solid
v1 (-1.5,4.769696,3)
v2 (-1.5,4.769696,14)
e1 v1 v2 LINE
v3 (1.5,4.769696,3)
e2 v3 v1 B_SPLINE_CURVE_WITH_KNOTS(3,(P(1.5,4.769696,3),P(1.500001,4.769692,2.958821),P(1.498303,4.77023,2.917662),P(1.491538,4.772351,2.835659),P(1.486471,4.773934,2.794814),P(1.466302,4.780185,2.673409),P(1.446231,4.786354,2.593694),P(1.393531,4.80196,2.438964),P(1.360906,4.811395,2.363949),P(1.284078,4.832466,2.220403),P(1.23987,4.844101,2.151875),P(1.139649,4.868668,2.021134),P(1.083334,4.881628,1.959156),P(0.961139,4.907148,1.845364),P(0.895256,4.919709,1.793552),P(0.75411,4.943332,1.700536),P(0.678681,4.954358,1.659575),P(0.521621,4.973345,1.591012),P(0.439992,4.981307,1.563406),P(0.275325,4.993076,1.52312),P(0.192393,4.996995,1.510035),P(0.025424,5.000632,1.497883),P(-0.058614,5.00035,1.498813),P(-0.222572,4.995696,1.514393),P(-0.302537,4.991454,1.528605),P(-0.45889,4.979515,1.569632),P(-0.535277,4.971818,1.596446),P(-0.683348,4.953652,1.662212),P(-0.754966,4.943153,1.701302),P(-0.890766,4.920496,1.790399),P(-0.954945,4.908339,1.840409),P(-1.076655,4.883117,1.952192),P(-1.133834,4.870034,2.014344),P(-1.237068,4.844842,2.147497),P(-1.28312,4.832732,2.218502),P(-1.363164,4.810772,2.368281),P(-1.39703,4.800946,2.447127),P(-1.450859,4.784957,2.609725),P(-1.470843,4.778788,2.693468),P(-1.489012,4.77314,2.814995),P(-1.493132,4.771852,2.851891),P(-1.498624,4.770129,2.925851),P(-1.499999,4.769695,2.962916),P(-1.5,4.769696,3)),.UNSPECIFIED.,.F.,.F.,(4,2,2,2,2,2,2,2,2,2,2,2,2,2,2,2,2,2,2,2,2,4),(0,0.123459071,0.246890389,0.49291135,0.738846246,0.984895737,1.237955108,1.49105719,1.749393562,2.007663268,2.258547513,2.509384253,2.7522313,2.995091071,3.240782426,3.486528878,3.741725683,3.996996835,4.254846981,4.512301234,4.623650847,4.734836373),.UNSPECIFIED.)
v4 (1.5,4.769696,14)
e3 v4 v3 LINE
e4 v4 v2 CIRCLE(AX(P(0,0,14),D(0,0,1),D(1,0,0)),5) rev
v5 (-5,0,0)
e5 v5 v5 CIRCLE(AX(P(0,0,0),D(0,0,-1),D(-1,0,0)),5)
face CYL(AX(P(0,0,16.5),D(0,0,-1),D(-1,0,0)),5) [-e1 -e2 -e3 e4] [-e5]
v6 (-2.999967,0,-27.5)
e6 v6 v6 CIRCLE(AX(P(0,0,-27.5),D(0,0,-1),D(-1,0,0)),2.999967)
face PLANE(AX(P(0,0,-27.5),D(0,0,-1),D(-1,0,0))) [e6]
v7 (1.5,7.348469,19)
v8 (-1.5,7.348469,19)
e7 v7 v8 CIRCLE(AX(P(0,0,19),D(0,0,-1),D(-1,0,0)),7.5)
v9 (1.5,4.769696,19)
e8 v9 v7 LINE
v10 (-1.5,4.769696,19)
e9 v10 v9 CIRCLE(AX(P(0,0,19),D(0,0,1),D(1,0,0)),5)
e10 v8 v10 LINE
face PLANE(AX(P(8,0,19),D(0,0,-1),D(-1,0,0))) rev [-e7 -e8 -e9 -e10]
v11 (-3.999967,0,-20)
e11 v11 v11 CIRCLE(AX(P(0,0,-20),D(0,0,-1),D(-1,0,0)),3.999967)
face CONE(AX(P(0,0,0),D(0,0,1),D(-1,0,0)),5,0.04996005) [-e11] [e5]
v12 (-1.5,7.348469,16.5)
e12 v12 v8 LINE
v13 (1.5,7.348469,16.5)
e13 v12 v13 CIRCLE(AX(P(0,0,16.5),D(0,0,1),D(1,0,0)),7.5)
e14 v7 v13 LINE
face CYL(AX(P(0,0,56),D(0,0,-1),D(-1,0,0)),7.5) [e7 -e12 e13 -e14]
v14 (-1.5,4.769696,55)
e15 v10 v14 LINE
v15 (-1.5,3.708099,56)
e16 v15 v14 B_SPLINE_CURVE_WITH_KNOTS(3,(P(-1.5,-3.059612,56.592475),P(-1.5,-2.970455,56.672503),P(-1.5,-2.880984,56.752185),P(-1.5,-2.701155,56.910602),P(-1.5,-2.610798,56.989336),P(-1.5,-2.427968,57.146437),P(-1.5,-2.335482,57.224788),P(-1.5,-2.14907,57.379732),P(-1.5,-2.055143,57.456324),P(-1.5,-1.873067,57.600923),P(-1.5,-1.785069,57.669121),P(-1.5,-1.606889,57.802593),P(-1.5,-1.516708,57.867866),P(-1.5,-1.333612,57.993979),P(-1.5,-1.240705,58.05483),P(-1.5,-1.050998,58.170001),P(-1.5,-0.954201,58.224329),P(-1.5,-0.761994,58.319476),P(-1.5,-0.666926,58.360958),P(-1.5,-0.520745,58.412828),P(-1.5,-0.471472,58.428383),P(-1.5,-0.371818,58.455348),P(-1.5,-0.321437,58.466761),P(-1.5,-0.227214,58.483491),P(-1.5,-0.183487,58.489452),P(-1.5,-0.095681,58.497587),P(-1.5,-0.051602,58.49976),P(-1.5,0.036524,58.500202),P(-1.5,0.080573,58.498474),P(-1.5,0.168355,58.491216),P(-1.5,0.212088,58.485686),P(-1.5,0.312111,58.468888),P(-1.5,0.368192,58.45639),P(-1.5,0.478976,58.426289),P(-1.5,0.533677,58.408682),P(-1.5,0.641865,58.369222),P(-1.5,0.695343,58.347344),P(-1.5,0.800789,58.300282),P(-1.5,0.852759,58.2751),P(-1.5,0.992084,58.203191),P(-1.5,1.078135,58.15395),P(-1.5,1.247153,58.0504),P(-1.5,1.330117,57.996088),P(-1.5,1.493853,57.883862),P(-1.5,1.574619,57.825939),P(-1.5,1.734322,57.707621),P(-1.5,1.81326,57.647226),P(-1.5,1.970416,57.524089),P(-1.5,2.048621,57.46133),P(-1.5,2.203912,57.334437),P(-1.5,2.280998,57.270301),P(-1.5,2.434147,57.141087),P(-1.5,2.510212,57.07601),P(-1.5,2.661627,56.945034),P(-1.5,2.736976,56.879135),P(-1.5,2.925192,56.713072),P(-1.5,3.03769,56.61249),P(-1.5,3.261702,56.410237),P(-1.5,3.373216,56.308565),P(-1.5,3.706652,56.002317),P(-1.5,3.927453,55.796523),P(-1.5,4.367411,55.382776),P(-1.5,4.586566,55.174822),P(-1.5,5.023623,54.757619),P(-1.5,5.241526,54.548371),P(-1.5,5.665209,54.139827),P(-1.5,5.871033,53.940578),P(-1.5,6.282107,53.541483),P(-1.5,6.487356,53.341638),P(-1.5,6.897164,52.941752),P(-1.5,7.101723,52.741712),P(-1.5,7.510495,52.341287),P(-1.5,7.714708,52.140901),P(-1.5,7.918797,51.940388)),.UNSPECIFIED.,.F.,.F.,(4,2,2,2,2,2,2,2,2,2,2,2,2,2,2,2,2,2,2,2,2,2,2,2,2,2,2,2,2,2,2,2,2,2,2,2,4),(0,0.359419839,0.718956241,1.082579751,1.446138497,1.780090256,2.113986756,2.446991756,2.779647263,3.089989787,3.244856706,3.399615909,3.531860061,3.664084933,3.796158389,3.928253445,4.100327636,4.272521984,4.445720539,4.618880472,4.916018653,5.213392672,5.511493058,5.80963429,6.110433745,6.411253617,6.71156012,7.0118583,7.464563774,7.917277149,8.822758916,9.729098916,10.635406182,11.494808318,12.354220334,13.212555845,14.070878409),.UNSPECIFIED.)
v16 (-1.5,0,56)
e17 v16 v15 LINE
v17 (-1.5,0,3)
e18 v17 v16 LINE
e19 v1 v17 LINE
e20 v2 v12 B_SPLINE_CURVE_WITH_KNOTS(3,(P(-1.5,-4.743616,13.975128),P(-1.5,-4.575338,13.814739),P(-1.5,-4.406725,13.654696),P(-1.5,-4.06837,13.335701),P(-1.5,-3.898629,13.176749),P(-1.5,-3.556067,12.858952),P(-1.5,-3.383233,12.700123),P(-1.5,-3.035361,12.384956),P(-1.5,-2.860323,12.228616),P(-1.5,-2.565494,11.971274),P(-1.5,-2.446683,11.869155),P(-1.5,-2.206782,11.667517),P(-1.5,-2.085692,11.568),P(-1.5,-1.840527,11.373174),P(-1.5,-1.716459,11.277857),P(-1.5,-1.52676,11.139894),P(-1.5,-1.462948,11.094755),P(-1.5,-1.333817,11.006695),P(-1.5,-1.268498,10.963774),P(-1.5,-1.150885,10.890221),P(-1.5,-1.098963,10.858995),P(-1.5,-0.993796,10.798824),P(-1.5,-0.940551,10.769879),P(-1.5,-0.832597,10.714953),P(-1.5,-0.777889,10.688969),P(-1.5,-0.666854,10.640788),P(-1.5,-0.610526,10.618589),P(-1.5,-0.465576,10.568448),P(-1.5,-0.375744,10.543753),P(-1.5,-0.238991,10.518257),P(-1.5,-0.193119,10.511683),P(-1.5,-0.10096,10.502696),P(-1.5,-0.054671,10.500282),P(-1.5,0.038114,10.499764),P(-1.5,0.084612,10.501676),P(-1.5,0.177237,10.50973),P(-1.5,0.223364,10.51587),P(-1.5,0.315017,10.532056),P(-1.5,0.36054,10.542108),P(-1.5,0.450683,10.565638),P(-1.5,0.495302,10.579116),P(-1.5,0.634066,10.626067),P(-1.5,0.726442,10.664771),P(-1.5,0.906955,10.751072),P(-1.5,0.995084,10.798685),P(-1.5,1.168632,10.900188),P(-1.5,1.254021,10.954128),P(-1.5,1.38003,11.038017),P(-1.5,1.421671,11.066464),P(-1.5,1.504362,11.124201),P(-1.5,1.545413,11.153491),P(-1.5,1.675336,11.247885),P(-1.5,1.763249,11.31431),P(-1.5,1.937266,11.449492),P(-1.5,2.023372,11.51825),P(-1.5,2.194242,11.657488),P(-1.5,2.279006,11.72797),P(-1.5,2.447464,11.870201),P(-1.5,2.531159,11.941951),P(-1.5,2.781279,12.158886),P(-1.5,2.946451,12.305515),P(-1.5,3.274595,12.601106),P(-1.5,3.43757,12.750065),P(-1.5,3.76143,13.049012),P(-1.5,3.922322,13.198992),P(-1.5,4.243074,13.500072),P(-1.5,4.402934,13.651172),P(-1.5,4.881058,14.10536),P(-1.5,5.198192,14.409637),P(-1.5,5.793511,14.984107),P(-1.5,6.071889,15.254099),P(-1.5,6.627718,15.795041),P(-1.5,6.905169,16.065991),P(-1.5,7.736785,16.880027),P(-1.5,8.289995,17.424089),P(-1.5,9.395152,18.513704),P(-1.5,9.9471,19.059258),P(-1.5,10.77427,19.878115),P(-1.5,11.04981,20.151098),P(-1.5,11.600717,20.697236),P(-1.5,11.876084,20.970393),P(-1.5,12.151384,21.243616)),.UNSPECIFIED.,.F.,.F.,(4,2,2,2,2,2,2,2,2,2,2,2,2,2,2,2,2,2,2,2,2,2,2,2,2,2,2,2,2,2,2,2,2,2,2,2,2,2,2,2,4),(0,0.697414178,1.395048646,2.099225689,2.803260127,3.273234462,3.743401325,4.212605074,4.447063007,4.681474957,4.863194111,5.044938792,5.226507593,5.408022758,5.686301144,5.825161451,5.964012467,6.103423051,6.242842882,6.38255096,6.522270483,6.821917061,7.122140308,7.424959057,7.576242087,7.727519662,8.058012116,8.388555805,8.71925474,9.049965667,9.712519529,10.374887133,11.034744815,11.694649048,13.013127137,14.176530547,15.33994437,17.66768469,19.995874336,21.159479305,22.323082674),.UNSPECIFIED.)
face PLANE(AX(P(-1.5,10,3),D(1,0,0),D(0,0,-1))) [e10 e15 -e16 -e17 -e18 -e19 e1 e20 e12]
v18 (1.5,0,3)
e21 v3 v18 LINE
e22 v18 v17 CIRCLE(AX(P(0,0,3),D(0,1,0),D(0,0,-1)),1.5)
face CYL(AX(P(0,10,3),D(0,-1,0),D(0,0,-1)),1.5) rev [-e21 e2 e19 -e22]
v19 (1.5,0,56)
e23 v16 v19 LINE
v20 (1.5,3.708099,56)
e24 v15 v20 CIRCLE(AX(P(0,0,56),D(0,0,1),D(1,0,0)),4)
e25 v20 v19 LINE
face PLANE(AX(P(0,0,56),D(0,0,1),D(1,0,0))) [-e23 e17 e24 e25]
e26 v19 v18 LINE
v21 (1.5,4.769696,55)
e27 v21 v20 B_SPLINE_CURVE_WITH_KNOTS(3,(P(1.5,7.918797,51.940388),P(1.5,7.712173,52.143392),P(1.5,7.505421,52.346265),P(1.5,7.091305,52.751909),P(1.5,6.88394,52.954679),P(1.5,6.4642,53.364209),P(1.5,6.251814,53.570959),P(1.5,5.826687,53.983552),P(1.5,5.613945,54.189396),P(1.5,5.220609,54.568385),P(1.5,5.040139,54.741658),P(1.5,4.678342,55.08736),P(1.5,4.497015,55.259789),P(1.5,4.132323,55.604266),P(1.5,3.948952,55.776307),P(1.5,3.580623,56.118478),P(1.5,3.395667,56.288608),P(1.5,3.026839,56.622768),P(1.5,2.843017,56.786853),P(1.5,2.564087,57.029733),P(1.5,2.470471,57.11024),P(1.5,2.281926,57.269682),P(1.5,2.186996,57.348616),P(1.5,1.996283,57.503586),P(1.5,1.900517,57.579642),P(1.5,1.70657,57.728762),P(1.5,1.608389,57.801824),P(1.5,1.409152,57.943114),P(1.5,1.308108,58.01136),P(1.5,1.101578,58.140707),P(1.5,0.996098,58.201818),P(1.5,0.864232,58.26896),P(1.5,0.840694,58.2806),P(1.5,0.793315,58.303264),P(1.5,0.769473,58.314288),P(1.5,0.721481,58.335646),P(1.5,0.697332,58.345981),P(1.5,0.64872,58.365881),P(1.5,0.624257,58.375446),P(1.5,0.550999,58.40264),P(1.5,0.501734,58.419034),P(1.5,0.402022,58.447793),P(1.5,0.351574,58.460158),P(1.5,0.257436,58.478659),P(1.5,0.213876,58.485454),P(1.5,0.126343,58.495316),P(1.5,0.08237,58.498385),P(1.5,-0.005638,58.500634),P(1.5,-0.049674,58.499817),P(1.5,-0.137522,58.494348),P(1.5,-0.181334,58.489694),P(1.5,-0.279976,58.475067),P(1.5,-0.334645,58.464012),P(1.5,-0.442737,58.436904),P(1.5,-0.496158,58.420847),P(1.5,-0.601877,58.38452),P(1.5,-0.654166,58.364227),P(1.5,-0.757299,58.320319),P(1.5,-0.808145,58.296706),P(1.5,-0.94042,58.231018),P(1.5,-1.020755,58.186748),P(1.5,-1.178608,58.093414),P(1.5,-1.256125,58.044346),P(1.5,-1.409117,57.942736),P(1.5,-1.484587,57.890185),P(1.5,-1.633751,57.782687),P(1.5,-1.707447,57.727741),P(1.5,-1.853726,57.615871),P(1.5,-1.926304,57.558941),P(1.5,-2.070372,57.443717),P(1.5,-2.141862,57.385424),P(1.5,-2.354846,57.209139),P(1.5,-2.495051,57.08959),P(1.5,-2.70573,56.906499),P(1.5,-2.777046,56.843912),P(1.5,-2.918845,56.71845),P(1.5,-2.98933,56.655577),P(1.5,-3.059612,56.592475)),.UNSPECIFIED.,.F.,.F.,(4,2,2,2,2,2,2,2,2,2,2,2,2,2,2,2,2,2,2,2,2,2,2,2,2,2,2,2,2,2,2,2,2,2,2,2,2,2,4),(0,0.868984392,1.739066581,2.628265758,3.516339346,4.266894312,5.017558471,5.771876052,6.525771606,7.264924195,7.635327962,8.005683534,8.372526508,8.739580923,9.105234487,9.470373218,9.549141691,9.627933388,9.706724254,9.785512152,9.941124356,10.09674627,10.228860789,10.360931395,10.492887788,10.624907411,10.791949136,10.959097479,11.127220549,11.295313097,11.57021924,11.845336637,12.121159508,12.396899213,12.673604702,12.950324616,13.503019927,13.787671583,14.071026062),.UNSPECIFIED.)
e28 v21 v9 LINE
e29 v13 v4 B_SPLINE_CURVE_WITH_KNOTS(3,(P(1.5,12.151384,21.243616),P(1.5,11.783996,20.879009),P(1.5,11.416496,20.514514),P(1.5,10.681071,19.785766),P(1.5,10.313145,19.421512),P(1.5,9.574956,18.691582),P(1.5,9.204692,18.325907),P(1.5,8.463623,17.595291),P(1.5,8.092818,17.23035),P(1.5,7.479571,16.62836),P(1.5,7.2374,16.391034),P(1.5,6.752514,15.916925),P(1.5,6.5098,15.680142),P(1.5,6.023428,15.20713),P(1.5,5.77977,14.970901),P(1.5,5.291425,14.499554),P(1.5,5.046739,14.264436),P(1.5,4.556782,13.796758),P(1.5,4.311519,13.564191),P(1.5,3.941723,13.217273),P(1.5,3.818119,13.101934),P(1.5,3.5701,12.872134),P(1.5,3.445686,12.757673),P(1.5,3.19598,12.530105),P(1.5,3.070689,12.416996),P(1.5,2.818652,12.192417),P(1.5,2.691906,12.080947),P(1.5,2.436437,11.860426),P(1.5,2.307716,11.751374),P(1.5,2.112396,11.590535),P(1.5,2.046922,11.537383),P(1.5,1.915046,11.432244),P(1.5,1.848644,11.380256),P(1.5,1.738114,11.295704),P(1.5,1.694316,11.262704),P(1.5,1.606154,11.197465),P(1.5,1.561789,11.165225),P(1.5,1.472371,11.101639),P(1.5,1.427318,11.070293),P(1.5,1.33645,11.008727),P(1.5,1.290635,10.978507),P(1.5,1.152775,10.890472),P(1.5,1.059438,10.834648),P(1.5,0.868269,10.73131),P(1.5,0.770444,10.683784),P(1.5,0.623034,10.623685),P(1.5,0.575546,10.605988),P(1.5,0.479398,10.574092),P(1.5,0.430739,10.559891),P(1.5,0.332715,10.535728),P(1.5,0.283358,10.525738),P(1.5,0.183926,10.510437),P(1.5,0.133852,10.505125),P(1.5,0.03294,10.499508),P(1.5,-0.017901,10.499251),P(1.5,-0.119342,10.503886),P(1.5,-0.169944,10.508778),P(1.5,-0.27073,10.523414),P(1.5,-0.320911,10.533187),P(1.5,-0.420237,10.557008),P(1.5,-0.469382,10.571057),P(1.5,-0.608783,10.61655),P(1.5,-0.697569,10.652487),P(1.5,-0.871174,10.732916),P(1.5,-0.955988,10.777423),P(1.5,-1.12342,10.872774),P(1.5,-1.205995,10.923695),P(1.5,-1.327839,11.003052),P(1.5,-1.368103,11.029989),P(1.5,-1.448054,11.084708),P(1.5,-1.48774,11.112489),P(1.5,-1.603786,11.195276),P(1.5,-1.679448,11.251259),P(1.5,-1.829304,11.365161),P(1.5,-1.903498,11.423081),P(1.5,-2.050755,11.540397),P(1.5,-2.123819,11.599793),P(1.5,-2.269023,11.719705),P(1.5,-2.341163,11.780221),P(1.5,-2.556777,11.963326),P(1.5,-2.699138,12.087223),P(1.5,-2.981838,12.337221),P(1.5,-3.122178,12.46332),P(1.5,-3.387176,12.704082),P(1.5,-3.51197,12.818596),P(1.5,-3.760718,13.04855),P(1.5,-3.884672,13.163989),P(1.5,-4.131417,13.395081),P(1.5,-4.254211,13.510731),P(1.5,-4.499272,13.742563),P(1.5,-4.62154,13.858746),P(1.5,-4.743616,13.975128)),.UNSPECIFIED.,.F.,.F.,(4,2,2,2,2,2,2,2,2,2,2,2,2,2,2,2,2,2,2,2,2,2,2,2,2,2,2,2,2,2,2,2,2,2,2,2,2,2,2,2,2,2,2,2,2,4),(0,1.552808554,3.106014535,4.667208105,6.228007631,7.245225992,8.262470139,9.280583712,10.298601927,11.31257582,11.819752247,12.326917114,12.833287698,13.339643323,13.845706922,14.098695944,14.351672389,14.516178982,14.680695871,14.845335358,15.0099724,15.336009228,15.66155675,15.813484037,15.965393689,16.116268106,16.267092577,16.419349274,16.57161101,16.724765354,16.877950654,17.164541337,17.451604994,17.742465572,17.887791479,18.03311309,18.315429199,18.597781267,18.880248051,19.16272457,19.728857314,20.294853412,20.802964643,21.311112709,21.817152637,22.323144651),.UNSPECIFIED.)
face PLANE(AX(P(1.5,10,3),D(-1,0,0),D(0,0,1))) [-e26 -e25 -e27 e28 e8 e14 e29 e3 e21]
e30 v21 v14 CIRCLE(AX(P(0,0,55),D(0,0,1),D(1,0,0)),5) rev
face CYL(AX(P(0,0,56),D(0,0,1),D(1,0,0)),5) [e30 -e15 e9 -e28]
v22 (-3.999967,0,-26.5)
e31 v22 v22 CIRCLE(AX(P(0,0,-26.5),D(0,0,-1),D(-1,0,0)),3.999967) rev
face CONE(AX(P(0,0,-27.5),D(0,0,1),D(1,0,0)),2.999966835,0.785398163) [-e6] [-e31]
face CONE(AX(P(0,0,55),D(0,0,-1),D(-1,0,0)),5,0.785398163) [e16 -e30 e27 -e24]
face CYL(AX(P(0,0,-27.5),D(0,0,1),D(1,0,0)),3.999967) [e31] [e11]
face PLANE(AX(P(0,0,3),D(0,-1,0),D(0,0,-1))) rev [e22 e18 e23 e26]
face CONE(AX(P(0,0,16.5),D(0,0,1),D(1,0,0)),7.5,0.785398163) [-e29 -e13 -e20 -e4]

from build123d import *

# Parameters (mm, degrees)
SKETCH1_R           = 5
BOSS_EXTRUDE1_DEPTH = 16.5
SKETCH2_R           = 7.5
BOSS_EXTRUDE2_DEPTH = 39.5
SKETCH16_W          = 3
SKETCH16_H          = 64.5
CHAMFER_1_SIZE      = 2.5
SKETCH9_R           = 5
EXTRUDE_1_DEPTH     = 20
EXTRUDE_1_TAPER     = 2.8625
SKETCH_1_R          = 3.999966835
EXTRUDE_2_DEPTH     = 7.5
CHAMFER_2_SIZE      = 1
CUT_EXTRUDE_1_DEPTH = 10


with BuildPart() as part:
    # Sketch1 → Boss-Extrude1 (new body)
    with BuildSketch(Plane.XY):
        Circle(SKETCH1_R)
    extrude(amount=BOSS_EXTRUDE1_DEPTH)

    # Sketch2 → Boss-Extrude2 (add)
    with BuildSketch(Plane.XY.offset(16.5)):
        Circle(SKETCH2_R)
    extrude(amount=BOSS_EXTRUDE2_DEPTH)

    # Sketch16 → Cut-Revolve1 (revolve, cut)
    with BuildSketch(Plane(origin=(0, 0, 0), x_dir=(1, 0, 0), z_dir=(0, 1, 0)), mode=Mode.PRIVATE) as cut_revolve1_sk:
        with Locations((6.5, -51.25)):
            Rectangle(SKETCH16_W, SKETCH16_H)
    revolve(cut_revolve1_sk.sketch.rotate(Axis((0, 0, 56), (0, 0, -1)), 180), axis=Axis((0, 0, 56), (0, 0, -1)), mode=Mode.SUBTRACT)

    # Фаска1
    chamfer_1_edges = [part.edges().sort_by_distance(p)[0] for p in [
        (-5, 0, 16.5),
    ]]
    chamfer(chamfer_1_edges, length=CHAMFER_1_SIZE - 0.0001)  # a hair under: the kernel refuses the full size

    # Sketch9 → Бобышка-Вытянуть1 (add)
    with BuildSketch(Plane(origin=(0, 0, 0), x_dir=(-1, 0, 0), z_dir=(0, 0, -1))):
        Circle(SKETCH9_R)
    extrude(amount=EXTRUDE_1_DEPTH, taper=EXTRUDE_1_TAPER)

    # Эскиз1 → Бобышка-Вытянуть2 (add)
    with BuildSketch(Plane(origin=(0, 0, -20), x_dir=(-1, 0, 0), z_dir=(0, 0, -1))):
        Circle(SKETCH_1_R)
    extrude(amount=EXTRUDE_2_DEPTH)

    # Фаска2
    chamfer_2_edges = [part.edges().sort_by_distance(p)[0] for p in [
        (5, 0, 56),
        (3.999966835, 0, -27.5),
    ]]
    chamfer(chamfer_2_edges, length=CHAMFER_2_SIZE)

    # Sketch38 → Вырез-Вытянуть1 (cut)
    with BuildSketch(Plane(origin=(0, 0, 0), x_dir=(1, 0, 0), z_dir=(0, 1, 0))):
        with BuildLine():
            Line((-1.5, -3), (-1.5, -67.243921767))
            ThreePointArc((-1.5, -67.243921767), (0, -68.743921767), (1.5, -67.243921767))
            Line((1.5, -67.243921767), (1.5, -3))
            ThreePointArc((1.5, -3), (0, -1.5), (-1.5, -3))
        make_face()
    extrude(amount=CUT_EXTRUDE_1_DEPTH, mode=Mode.SUBTRACT)


solid = part.part
